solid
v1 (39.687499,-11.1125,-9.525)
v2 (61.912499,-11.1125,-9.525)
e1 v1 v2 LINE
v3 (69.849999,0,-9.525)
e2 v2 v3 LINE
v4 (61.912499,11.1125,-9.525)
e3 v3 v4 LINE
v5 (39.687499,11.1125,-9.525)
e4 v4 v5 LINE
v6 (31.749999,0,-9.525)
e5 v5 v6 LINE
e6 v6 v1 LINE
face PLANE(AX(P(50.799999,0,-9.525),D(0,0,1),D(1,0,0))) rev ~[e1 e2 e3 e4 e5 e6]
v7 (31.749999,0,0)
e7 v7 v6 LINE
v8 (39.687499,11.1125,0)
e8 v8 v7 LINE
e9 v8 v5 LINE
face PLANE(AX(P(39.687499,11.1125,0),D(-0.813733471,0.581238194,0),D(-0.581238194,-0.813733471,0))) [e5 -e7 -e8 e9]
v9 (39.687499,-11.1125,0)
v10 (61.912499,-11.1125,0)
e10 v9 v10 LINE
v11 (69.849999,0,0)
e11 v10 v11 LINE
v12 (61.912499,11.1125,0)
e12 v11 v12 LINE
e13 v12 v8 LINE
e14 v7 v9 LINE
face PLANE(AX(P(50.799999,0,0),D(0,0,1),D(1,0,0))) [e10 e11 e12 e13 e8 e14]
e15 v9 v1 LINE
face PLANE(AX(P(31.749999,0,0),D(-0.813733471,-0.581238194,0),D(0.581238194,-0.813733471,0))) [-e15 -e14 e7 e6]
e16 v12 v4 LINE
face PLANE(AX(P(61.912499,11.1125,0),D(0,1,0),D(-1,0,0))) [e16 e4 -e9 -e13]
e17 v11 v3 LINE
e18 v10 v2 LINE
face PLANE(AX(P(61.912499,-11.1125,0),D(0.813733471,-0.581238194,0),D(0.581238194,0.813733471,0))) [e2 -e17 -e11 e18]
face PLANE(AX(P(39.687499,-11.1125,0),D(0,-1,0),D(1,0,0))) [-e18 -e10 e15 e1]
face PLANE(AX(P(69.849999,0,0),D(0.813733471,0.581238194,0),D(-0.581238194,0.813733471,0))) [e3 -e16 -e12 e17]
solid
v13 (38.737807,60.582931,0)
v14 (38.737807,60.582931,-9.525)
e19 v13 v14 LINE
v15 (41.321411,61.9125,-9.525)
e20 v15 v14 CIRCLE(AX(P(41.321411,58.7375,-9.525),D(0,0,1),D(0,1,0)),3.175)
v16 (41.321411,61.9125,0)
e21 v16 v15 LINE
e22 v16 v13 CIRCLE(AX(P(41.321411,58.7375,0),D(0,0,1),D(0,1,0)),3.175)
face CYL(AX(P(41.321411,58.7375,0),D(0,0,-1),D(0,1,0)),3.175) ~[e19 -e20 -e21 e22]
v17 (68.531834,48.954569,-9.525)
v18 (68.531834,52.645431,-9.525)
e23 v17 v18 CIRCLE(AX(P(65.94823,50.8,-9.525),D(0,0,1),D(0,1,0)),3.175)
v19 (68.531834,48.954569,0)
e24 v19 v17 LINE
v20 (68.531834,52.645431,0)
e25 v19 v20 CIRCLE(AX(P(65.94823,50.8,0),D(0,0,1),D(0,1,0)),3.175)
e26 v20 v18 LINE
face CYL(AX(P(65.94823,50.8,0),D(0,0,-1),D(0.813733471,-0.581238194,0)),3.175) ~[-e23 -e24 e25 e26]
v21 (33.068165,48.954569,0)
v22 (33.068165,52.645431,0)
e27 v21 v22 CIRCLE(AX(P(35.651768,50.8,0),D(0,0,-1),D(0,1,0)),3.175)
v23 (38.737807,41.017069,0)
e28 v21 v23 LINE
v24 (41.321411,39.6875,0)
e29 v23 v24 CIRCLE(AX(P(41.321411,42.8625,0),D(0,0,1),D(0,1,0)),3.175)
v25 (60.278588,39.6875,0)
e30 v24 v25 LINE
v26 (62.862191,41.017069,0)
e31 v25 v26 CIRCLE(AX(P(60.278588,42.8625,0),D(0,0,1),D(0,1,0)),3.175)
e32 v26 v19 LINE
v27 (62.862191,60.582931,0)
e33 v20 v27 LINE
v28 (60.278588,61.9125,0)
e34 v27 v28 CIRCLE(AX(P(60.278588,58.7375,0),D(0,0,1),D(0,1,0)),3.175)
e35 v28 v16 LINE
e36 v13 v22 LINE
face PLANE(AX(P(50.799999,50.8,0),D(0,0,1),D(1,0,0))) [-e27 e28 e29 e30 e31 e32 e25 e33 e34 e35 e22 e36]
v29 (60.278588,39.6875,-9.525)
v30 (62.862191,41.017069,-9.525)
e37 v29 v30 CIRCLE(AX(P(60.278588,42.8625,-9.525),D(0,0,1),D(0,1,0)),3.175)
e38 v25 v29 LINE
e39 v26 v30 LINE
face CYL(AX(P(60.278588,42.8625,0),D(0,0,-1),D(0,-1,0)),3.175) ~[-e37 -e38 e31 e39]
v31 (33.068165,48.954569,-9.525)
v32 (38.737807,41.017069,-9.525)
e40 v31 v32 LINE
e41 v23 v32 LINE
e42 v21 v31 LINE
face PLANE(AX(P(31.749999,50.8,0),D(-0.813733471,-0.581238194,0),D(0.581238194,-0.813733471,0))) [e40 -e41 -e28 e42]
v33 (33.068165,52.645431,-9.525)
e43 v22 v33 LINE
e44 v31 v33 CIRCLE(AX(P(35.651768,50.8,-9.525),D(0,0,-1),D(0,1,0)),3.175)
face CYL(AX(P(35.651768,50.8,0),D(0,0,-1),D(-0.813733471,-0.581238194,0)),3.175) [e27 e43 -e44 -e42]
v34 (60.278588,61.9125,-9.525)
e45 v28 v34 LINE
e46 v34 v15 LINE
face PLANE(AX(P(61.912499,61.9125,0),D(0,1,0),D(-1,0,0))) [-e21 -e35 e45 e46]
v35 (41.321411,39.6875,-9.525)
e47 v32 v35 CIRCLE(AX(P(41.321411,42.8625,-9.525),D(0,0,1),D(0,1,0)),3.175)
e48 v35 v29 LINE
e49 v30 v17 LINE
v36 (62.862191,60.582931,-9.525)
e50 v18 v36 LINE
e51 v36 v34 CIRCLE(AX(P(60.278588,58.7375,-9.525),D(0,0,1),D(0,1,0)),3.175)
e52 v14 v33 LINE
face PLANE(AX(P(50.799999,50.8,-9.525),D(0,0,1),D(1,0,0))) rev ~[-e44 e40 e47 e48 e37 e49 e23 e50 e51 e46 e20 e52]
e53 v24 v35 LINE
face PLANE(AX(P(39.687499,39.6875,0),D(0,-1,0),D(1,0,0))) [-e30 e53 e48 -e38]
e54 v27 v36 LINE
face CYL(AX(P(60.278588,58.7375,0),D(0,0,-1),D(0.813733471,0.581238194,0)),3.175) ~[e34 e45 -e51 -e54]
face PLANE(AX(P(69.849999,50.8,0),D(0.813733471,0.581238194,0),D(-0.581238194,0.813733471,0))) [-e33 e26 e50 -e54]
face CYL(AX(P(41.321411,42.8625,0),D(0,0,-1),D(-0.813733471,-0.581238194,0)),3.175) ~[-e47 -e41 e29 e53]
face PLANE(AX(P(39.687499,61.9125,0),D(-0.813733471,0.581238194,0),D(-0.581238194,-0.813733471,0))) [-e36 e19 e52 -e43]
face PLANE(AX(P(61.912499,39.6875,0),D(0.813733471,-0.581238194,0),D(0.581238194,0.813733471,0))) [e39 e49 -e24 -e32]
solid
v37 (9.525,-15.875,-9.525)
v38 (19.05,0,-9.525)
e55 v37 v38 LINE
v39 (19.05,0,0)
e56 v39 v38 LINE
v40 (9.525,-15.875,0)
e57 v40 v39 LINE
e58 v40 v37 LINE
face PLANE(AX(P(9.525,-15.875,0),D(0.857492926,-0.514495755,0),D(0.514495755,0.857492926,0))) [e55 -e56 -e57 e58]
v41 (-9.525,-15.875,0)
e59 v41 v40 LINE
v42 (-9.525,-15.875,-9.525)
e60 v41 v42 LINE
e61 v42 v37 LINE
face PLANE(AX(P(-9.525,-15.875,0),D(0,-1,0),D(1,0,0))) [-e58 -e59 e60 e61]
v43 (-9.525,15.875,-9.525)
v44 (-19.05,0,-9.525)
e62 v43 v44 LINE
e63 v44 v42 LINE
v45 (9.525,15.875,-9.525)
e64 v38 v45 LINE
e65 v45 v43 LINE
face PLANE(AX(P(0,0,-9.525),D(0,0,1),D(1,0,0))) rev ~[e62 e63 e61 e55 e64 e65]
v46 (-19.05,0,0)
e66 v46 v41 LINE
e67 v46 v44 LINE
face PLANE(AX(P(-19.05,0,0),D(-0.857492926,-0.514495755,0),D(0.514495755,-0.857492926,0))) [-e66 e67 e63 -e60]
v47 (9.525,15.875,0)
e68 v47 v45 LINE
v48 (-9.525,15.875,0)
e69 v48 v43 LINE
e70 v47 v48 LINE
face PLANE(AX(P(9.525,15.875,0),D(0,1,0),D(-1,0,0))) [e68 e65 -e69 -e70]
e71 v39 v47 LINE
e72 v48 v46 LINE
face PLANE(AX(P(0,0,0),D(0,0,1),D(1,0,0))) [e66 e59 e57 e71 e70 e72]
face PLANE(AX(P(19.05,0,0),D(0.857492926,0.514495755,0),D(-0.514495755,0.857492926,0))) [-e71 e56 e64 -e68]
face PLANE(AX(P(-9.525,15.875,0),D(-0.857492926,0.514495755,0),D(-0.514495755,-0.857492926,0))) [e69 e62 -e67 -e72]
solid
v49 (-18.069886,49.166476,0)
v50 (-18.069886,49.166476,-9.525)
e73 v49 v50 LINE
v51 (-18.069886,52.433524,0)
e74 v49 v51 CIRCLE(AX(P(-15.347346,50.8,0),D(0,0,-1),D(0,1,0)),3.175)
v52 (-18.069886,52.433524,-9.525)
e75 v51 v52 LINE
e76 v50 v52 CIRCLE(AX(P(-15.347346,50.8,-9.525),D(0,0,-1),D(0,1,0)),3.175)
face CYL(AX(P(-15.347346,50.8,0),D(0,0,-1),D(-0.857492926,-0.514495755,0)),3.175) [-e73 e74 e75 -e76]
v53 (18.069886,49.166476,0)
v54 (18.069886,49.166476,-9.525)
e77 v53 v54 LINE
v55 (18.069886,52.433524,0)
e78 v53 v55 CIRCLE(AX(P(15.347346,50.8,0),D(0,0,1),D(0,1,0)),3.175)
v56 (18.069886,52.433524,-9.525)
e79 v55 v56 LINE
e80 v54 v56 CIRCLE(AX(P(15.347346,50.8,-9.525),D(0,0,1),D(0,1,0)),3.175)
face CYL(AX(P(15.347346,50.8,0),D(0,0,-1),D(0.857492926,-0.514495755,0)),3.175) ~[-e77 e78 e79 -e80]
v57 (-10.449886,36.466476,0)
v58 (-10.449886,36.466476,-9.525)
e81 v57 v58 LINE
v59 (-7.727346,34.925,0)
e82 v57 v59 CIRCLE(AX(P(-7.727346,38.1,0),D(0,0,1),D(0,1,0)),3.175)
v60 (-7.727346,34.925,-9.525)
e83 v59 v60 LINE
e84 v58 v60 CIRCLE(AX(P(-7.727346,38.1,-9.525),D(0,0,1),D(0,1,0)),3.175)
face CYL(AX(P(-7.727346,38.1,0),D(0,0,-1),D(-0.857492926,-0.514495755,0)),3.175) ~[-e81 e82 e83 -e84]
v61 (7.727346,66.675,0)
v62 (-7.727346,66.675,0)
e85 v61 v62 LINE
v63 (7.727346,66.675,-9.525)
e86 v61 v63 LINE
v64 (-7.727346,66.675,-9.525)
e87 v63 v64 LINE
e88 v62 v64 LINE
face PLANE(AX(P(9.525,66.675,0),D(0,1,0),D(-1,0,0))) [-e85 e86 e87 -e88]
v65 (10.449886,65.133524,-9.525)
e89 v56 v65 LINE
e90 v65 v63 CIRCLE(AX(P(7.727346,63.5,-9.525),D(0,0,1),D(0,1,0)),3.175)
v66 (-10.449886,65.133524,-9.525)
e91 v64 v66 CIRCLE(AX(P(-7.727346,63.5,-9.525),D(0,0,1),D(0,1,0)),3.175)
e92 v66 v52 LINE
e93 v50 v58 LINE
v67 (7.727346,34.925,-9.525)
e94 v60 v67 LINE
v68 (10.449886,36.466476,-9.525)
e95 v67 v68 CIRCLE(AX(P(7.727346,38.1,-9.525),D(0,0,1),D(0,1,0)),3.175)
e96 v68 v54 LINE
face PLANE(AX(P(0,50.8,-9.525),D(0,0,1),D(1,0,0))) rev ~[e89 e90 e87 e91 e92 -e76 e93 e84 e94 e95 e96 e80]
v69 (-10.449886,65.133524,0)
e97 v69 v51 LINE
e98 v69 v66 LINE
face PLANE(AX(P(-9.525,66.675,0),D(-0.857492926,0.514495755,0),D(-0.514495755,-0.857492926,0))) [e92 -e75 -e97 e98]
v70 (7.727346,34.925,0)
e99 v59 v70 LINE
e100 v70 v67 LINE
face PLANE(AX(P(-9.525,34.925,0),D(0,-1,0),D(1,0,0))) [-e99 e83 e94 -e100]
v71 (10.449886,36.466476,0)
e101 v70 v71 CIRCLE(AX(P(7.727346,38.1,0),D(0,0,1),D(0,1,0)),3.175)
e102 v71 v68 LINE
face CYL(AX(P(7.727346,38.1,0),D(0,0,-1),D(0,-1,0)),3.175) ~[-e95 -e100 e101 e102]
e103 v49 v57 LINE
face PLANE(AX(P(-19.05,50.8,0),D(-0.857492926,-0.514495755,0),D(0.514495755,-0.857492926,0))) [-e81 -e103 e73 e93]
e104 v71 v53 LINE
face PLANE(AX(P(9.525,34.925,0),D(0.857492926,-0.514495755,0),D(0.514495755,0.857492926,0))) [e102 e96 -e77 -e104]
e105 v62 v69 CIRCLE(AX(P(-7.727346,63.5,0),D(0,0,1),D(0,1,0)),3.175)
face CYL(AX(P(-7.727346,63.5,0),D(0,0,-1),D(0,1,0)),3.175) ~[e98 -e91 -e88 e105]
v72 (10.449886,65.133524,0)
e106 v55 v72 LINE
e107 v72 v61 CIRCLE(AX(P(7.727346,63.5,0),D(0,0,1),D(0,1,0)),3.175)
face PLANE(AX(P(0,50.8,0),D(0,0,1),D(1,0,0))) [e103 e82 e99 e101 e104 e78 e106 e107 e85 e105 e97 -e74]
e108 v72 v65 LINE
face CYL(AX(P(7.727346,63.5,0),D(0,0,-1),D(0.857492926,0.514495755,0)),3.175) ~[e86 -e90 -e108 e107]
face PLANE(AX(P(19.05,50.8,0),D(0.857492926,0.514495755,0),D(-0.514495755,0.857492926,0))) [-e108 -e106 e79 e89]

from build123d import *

# Parameters (mm, degrees)
F1_DEPTH = 9.525
F2_R     = 3.175
F2_2_R   = 3.175


# Not quite as in the source:
# - a feature names something its author has since deleted; it is built from what else it names


with BuildPart() as f1:
    # F0 (on Top) → F1 (new body)
    with BuildSketch(Plane.XY):
        Polygon((-19.05, 50.8), (-9.525, 34.925), (9.525, 34.925), (19.05, 50.8), (9.525, 66.675), (-9.525, 66.675), align=None)
    extrude(amount=-F1_DEPTH)

    # F2
    f2_edges = [f1.edges().sort_by_distance(p)[0] for p in [
        (-19.05, 50.8, -4.7625),
        (-9.525, 34.925, -4.7625),
        (19.05, 50.8, -4.7625),
        (9.525, 34.925, -4.7625),
        (9.525, 66.675, -4.7625),
        (-9.525, 66.675, -4.7625),
    ]]
    fillet(f2_edges, radius=F2_R)


with BuildPart() as f1b:
    # F0 (on Top) → F1, piece 2 (new body)
    with BuildSketch(Plane.XY):
        Polygon((31.7499993861, 50.8), (39.6874993861, 39.6875), (61.9124993861, 39.6875), (69.8499993861, 50.8), (61.9124993861, 61.9125), (39.6874993861, 61.9125), align=None)
    extrude(amount=-F1_DEPTH)

    # F2#2
    f2_2_edges = [f1b.edges().sort_by_distance(p)[0] for p in [
        (31.749999, 50.8, -4.7625),
        (39.687499, 61.9125, -4.7625),
        (61.912499, 61.9125, -4.7625),
        (69.849999, 50.8, -4.7625),
        (61.912499, 39.6875, -4.7625),
        (39.687499, 39.6875, -4.7625),
    ]]
    fillet(f2_2_edges, radius=F2_2_R)


with BuildPart() as f1c:
    # F0 (on Top) → F1, piece 3 (new body)
    with BuildSketch(Plane.XY):
        Polygon((-19.05, 0), (-9.525, -15.875), (9.525, -15.875), (19.05, 0), (9.525, 15.875), (-9.525, 15.875), align=None)
    extrude(amount=-F1_DEPTH)


with BuildPart() as f1d:
    # F0 (on Top) → F1, piece 4 (new body)
    with BuildSketch(Plane.XY):
        Polygon((31.7499993861, 0), (39.6874993861, -11.1125), (61.9124993861, -11.1125), (69.8499993861, 0), (61.9124993861, 11.1125), (39.6874993861, 11.1125), align=None)
    extrude(amount=-F1_DEPTH)


solid = Compound([f1.part, f1b.part, f1c.part, f1d.part])
